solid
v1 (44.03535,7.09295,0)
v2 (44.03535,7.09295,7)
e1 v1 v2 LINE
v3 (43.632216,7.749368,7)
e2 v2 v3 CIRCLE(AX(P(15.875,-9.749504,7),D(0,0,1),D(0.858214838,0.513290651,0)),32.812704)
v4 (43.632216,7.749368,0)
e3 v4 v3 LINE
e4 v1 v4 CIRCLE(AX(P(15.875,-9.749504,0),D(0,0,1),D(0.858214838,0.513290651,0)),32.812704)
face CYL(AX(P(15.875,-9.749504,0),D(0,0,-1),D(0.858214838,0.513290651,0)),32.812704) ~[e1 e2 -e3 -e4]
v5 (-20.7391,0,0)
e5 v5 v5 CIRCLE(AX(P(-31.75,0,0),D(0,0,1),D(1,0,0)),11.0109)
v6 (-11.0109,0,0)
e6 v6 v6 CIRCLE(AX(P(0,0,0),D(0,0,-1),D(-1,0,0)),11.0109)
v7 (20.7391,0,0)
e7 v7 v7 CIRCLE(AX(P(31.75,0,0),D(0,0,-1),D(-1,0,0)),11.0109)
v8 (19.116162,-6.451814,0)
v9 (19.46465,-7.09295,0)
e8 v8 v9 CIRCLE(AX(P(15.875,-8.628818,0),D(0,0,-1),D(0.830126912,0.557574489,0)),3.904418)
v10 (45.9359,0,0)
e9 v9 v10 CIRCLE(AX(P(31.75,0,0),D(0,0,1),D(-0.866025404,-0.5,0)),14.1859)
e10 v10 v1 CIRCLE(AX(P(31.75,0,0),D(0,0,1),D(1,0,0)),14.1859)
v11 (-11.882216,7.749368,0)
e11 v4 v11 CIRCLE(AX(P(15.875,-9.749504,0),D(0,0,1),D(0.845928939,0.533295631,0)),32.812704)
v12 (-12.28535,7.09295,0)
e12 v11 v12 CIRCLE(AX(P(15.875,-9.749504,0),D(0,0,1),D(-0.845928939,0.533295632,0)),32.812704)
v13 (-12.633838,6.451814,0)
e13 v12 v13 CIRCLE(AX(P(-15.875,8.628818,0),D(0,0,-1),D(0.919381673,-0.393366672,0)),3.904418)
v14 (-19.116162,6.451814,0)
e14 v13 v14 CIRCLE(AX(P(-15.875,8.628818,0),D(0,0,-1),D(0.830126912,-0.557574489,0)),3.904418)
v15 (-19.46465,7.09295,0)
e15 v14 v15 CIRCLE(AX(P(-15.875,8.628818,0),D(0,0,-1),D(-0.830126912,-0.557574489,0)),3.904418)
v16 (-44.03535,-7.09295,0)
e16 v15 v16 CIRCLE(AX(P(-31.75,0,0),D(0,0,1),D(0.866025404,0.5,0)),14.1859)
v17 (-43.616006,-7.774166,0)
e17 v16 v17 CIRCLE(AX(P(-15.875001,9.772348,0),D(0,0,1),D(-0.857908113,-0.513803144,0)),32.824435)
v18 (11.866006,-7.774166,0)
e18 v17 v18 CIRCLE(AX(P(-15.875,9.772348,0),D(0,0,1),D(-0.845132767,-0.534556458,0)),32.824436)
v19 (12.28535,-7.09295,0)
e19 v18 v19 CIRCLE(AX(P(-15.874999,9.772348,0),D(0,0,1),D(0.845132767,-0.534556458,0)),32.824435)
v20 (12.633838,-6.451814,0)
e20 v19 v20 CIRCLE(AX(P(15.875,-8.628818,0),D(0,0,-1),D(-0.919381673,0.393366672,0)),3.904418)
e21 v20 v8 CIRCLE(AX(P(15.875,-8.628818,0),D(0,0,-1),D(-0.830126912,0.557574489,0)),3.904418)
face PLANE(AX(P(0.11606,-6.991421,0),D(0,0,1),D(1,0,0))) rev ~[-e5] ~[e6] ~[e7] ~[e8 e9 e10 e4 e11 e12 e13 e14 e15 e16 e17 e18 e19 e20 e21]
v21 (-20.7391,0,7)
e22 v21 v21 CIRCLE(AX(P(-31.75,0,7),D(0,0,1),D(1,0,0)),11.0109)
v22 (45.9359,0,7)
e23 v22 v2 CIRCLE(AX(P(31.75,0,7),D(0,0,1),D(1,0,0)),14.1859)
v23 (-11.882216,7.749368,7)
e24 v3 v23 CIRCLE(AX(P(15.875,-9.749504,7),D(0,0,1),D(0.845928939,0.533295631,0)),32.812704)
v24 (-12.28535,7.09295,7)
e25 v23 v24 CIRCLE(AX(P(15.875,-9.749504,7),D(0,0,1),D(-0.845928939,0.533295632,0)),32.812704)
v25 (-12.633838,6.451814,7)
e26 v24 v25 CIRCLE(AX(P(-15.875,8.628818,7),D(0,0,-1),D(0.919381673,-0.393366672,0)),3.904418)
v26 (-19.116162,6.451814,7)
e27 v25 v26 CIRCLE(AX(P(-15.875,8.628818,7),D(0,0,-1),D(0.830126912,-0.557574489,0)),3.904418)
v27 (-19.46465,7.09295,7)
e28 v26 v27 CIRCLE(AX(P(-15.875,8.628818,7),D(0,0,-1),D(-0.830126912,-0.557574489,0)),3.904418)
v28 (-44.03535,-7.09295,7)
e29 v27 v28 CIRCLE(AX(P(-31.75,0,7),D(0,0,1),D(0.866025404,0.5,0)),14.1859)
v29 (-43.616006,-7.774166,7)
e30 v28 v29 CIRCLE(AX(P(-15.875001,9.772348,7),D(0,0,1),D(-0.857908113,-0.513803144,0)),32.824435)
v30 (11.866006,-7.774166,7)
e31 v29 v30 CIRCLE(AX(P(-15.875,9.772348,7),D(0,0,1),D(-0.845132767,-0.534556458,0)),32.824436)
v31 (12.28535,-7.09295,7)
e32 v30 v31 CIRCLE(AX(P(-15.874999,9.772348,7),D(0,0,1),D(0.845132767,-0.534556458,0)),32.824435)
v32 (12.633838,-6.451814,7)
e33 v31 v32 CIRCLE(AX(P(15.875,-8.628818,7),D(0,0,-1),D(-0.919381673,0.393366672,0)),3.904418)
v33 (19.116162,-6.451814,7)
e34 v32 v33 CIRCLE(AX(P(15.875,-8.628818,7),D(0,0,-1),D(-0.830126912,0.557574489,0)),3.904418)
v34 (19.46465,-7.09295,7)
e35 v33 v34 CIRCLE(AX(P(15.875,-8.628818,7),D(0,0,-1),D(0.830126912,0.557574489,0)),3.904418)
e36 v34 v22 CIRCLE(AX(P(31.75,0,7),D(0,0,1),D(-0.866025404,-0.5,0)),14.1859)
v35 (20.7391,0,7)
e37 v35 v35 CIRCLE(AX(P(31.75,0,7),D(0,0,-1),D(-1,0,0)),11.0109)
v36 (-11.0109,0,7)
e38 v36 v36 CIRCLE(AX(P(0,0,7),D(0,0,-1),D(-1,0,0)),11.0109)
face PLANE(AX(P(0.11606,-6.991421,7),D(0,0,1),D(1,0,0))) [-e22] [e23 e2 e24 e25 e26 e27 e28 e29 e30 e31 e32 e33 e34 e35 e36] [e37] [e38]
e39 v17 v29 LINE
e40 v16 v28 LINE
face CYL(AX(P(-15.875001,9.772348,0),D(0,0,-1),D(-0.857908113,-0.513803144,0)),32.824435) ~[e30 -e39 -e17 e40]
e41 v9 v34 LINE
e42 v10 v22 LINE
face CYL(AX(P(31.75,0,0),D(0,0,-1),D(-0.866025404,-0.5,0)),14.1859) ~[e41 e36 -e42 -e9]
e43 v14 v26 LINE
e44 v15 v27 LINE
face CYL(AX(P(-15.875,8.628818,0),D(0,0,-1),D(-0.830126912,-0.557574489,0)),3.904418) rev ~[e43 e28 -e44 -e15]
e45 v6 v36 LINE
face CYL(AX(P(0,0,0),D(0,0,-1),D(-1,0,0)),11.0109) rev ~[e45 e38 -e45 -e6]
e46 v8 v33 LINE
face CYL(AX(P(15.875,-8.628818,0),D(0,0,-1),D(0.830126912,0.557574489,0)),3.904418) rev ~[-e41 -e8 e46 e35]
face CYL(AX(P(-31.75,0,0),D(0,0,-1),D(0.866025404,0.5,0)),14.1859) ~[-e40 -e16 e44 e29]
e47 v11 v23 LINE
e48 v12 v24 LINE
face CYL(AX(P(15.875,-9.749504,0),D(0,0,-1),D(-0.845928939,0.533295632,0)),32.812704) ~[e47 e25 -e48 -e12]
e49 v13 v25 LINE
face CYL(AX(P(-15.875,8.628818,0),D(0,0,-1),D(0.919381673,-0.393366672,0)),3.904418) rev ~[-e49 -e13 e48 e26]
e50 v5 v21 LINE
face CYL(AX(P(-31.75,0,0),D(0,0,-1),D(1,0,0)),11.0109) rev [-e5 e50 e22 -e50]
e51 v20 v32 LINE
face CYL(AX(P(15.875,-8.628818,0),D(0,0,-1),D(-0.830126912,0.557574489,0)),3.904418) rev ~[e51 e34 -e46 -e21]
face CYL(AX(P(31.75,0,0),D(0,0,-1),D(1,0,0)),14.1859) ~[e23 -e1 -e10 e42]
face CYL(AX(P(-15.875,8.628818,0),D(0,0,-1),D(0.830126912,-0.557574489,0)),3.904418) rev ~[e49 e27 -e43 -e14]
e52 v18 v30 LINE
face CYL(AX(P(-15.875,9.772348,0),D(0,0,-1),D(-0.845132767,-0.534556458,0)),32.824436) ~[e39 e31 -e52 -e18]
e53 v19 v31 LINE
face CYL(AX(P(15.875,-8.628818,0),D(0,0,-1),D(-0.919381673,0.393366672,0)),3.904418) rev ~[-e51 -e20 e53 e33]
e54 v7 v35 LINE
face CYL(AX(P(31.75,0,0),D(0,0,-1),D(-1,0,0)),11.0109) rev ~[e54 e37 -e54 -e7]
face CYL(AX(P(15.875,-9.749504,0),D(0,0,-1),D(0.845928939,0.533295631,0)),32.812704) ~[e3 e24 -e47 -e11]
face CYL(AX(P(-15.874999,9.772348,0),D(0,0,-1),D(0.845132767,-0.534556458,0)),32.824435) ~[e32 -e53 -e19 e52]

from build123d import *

# Parameters (mm, degrees)
F0_R     = 11.0109
F1_DEPTH = 7


with BuildPart() as f1:
    # F0 (on Top) → F1 (new body)
    with BuildSketch(Plane.XY):
        with BuildLine():
            Line((14.1859, 0), (11.0109, 0))
            ThreePointArc((11.0109, 0), (0, -11.0109), (-11.0109, 0))
            Line((-11.0109, 0), (-14.1859, 0))
            ThreePointArc((-14.1859, 0), (-4.0564627793, -13.5935598182), (11.8660062633, -7.7741658182))
            ThreePointArc((11.8660062633, -7.7741658182), (12.0777532722, -7.4348353952), (12.2853497755, -7.09295))
            ThreePointArc((12.2853497755, -7.09295), (12.4445825488, -6.7642227487), (12.6338376613, -6.4518140673))
            ThreePointArc((12.6338376613, -6.4518140673), (13.7924275689, -3.3179361907), (14.1859, 0))
        make_face()
        with BuildLine():
            ThreePointArc((-11.0109, 0), (0, 11.0109), (11.0109, 0))
            Line((11.0109, 0), (14.1859, 0))
            ThreePointArc((14.1859, 0), (4.0422659472, 13.5977882327), (-11.882216203, 7.7493675171))
            ThreePointArc((-11.882216203, 7.7493675171), (-12.0857093478, 7.4223418162), (-12.2853497755, 7.09295))
            ThreePointArc((-12.2853497755, 7.09295), (-12.4445825488, 6.7642227487), (-12.6338376613, 6.4518140673))
            ThreePointArc((-12.6338376613, 6.4518140673), (-13.7924275689, 3.3179361907), (-14.1859, 0))
            Line((-14.1859, 0), (-11.0109, 0))
        make_face()
        with BuildLine():
            Line((17.5641, 0), (14.1859, 0))
            ThreePointArc((14.1859, 0), (13.7924275689, -3.3179361907), (12.6338376613, -6.4518140673))
            ThreePointArc((12.6338376613, -6.4518140673), (15.875, -4.7244), (19.1161623387, -6.4518140673))
            ThreePointArc((19.1161623387, -6.4518140673), (17.9575724311, -3.3179361907), (17.5641, 0))
        make_face()
        with BuildLine():
            ThreePointArc((-11.882216203, 7.7493675171), (4.0422659472, 13.5977882327), (14.1859, 0))
            Line((14.1859, 0), (17.5641, 0))
            ThreePointArc((17.5641, 0), (27.7077340528, 13.5977882327), (43.632216203, 7.7493675171))
            ThreePointArc((43.632216203, 7.7493675171), (15.875, 23.0632), (-11.882216203, 7.7493675171))
        make_face()
        with BuildLine():
            Line((-17.5641, 0), (-14.1859, 0))
            ThreePointArc((-14.1859, 0), (-13.7924275689, 3.3179361907), (-12.6338376613, 6.4518140673))
            ThreePointArc((-12.6338376613, 6.4518140673), (-15.875, 4.7244), (-19.1161623387, 6.4518140673))
            ThreePointArc((-19.1161623387, 6.4518140673), (-17.9575724311, 3.3179361907), (-17.5641, 0))
        make_face()
        with BuildLine():
            ThreePointArc((11.8660062633, -7.7741658182), (-4.0564627793, -13.5935598182), (-14.1859, 0))
            Line((-14.1859, 0), (-17.5641, 0))
            ThreePointArc((-17.5641, 0), (-27.6935372207, -13.5935598182), (-43.6160062633, -7.7741658182))
            ThreePointArc((-43.6160062633, -7.7741658182), (-15.875, -23.0520875), (11.8660062633, -7.7741658182))
        make_face()
        with BuildLine():
            ThreePointArc((43.632216203, 7.7493675171), (27.7077340528, 13.5977882327), (17.5641, 0))
            ThreePointArc((17.5641, 0), (17.9575724311, -3.3179361907), (19.1161623387, -6.4518140673))
            ThreePointArc((19.1161623387, -6.4518140673), (19.3054174512, -6.7642227487), (19.4646502245, -7.09295))
            ThreePointArc((19.4646502245, -7.09295), (35.4215810919, -13.7025271792), (45.9359, 0))
            ThreePointArc((45.9359, 0), (45.4525271792, 3.6715810919), (44.0353497755, 7.09295))
            ThreePointArc((44.0353497755, 7.09295), (43.8357093478, 7.4223418162), (43.632216203, 7.7493675171))
        make_face()
        with BuildLine():
            ThreePointArc((42.7609, 0), (31.75, -11.0109), (20.7391, 0))
            ThreePointArc((20.7391, 0), (31.75, 11.0109), (42.7609, 0))
        make_face(mode=Mode.SUBTRACT)
        with BuildLine():
            ThreePointArc((-43.6160062633, -7.7741658182), (-27.6935372207, -13.5935598182), (-17.5641, 0))
            ThreePointArc((-17.5641, 0), (-17.9575724311, 3.3179361907), (-19.1161623387, 6.4518140673))
            ThreePointArc((-19.1161623387, 6.4518140673), (-19.3054174512, 6.7642227487), (-19.4646502245, 7.09295))
            ThreePointArc((-19.4646502245, 7.09295), (-38.84295, 12.2853497755), (-44.0353497755, -7.09295))
            ThreePointArc((-44.0353497755, -7.09295), (-43.8277532722, -7.4348353952), (-43.6160062633, -7.7741658182))
        make_face()
        with Locations((-31.75, 0)):
            Circle(F0_R, mode=Mode.SUBTRACT)
    extrude(amount=F1_DEPTH)


solid = f1.part
